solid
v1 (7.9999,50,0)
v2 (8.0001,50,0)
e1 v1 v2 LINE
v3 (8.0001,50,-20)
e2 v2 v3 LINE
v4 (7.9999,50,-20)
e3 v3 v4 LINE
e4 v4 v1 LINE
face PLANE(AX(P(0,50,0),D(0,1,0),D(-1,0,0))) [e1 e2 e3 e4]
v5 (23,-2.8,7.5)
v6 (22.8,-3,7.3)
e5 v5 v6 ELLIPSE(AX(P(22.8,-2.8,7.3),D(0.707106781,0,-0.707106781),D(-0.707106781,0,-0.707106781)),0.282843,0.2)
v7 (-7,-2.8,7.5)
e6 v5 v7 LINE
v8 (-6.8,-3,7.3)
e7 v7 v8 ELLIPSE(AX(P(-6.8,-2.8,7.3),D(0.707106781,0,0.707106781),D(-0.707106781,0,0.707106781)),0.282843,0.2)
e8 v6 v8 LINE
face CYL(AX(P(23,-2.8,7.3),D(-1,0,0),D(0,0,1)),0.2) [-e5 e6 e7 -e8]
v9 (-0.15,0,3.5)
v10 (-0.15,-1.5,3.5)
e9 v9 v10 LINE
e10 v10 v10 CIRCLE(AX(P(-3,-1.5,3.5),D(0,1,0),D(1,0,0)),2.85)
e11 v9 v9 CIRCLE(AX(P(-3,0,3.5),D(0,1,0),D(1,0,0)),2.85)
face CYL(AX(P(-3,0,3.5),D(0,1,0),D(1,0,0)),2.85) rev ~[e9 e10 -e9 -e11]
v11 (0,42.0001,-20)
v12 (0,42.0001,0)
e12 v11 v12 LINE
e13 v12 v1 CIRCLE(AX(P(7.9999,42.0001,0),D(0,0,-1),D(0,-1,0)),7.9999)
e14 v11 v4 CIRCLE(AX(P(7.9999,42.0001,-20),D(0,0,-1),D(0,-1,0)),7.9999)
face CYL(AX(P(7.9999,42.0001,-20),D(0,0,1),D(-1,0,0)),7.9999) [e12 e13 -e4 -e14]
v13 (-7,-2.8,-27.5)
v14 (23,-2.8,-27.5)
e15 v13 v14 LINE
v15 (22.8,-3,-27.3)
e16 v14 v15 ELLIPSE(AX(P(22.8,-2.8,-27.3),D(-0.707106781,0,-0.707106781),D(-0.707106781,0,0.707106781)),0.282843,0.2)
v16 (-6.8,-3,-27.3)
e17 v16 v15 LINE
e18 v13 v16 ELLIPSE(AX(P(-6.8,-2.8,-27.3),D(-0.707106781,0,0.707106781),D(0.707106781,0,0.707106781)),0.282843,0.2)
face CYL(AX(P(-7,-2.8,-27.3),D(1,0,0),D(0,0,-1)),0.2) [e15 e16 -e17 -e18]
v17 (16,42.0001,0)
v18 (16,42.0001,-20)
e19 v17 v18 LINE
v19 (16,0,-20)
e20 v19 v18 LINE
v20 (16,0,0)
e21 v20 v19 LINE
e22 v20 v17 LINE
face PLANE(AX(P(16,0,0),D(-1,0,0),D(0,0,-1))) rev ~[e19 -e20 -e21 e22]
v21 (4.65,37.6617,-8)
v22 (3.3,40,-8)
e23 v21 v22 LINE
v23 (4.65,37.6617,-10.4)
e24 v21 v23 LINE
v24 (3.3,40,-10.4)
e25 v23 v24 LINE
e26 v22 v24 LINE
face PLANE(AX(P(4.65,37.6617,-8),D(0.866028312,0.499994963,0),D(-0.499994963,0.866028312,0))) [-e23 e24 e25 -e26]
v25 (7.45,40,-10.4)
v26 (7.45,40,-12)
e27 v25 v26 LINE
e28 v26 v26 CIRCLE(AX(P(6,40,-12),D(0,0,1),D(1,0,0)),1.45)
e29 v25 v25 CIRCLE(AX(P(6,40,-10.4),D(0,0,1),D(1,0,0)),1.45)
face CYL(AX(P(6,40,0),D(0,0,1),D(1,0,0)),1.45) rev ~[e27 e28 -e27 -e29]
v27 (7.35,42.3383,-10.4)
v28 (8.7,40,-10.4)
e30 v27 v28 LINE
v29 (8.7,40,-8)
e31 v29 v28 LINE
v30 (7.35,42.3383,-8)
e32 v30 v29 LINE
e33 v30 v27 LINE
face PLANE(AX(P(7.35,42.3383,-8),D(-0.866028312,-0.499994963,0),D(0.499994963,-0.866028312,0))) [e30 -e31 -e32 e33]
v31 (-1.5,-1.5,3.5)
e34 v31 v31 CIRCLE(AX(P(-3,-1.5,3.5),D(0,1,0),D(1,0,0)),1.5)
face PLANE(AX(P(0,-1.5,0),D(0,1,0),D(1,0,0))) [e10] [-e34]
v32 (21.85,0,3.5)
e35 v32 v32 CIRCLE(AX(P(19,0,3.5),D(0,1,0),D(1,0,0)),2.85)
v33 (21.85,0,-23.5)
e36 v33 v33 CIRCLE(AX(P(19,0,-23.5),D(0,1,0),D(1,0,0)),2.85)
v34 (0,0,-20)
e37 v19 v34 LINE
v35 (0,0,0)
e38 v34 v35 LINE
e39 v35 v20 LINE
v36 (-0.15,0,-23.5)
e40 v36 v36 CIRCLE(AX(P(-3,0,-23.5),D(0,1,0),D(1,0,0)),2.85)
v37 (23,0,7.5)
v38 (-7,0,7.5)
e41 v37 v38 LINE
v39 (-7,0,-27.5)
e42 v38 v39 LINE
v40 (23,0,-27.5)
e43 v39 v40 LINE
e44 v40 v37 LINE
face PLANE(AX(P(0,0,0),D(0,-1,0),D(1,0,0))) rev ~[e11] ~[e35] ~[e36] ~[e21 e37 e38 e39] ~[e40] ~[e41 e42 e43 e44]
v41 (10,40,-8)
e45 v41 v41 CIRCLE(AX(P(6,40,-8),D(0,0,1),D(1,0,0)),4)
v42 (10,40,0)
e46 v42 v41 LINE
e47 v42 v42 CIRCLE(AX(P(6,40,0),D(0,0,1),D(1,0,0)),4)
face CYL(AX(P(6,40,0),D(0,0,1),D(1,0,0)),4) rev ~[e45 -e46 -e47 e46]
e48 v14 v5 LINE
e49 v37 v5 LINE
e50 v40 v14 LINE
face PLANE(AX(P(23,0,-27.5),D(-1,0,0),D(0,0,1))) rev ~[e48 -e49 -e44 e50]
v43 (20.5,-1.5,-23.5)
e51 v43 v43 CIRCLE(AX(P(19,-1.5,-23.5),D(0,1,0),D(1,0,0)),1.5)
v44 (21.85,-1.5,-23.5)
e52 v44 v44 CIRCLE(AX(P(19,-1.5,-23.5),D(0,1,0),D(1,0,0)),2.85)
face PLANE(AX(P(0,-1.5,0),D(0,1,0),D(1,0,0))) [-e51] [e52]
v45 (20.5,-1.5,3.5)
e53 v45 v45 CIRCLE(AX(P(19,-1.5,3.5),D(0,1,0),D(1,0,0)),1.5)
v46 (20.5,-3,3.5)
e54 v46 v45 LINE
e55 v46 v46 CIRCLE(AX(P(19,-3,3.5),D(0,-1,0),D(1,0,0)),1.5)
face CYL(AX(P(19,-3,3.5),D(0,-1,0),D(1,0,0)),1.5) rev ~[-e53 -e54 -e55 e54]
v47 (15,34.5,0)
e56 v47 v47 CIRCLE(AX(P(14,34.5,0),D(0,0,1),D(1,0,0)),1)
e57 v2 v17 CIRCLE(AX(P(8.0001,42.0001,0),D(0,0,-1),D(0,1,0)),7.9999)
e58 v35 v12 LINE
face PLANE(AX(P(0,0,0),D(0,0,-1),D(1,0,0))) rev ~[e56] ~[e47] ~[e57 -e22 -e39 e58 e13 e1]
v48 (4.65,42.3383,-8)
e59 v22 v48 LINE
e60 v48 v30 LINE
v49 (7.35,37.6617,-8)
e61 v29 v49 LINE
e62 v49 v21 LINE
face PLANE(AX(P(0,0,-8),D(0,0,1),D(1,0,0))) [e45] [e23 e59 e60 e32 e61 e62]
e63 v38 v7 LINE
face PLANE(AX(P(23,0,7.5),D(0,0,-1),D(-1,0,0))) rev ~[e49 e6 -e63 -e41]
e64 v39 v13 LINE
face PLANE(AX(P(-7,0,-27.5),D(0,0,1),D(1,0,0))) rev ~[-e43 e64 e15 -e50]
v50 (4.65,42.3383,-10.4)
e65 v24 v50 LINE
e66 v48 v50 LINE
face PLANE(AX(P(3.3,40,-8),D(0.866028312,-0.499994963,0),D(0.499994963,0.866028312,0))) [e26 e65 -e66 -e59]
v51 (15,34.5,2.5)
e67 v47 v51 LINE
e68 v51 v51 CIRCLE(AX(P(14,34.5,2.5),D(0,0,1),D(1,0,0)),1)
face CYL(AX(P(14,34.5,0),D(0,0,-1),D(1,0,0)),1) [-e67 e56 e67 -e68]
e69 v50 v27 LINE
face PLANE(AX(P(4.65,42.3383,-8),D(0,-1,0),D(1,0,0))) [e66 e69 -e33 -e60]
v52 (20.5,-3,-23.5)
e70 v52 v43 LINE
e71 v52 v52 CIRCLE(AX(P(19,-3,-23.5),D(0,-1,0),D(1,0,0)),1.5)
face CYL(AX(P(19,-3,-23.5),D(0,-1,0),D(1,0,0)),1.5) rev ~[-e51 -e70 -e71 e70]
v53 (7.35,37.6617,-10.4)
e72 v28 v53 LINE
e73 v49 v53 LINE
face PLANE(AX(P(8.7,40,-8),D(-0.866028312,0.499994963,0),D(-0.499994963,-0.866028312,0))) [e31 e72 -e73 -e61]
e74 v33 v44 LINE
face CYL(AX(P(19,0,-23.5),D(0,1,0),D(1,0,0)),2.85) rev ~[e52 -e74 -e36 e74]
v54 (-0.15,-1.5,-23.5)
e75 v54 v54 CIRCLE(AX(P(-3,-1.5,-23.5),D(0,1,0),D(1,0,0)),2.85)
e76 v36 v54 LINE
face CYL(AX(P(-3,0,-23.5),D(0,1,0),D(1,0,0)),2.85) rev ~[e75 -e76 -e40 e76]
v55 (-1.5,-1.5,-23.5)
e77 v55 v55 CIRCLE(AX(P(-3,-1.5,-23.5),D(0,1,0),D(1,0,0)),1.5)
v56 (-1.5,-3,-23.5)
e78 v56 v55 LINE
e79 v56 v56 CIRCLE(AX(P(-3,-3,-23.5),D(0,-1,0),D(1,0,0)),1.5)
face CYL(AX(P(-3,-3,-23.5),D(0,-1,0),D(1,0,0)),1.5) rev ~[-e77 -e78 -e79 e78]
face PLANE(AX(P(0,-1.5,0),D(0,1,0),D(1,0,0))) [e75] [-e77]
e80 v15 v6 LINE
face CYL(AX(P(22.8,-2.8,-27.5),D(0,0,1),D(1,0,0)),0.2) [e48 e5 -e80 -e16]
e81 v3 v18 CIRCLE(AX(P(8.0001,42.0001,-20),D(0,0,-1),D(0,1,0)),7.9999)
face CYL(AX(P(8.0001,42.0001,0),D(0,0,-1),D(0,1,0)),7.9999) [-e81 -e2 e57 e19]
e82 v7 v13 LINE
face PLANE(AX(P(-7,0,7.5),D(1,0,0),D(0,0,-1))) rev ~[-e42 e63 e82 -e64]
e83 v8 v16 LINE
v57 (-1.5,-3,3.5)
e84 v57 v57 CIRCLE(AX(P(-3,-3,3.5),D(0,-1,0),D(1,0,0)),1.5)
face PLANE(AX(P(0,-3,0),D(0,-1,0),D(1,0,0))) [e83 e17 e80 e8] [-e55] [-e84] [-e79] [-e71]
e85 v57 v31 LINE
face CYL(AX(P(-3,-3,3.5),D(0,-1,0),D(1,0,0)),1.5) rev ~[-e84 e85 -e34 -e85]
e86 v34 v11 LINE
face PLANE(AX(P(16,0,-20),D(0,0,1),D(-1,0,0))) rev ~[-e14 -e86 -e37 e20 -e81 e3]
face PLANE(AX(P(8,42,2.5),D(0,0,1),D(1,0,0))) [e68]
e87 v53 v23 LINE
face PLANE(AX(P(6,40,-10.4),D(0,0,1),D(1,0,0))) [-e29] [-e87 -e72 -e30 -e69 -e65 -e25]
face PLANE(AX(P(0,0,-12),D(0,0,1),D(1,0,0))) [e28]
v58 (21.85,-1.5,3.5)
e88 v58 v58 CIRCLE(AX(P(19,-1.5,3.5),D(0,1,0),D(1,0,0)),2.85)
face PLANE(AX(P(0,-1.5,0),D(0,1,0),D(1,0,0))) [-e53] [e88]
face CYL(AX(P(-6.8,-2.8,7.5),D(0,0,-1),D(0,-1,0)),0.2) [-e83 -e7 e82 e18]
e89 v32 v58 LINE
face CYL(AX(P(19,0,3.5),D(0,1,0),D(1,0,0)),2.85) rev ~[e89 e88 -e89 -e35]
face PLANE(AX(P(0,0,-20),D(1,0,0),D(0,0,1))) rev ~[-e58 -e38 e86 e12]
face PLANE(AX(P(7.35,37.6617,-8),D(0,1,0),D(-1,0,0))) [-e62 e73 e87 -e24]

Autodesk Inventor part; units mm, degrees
ref_plane "YZ Plane" through (0, 0, 0) normal (1, 0, 0) x (0, 1, 0)
ref_plane "XZ Plane" through (0, 0, 0) normal (0, 1, 0) x (-1, 0, 0)
ref_plane "XY Plane" through (0, 0, 0) normal (0, 0, 1) x (1, 0, 0)
sketch "底面" plane through (0, 0, 0) normal (0, 1, 0) x (-1, 0, 0)
  line L0 (0, 0) -> (-16, 0)
  line L1 (-16, 0) -> (-16, -20)
  line L2 (-16, -20) -> (0, -20)
  line L3 (0, -20) -> (0, 0)
  dimension "d0" = 16
  dimension "d1" = 20
extrude "本体" add sketch "底面" along normal blind 50
sketch "ねじ穴スケッチ" plane through (0, 0, 0) normal (0, 0, 1) x (1, 0, 0)
  circle A0 centre (6, 40) radius 1.45
  line L0 (0, 50) -> (16, 50) projected
  line L1 (16, 0) -> (16, 50) projected
  point P0 (0, 0)
  dimension "d6" = 10
  dimension "d9" = 2.9
  dimension "d17" = 10
extrude "ねじ穴" cut sketch "ねじ穴スケッチ" against normal blind 12
sketch "接合部スケッチ" plane through (0, 0, 0) normal (0, 0, 1) x (1, 0, 0)
  circle A0 centre (6, 40) radius 1.45 projected
  circle A1 centre (6, 40) radius 4
  point P0 (0, 0)
  dimension "d10" = 8
extrude "接合部" cut sketch "接合部スケッチ" against normal blind 8
sketch "スケッチ4" plane through (6, 40, -8) normal (0, 0, 1) x (1, 0, 0)
  line L0 (2.7, 0) -> (1.35, -2.3383)
  line L1 (1.35, -2.3383) -> (-1.35, -2.3383)
  line L2 (-1.35, -2.3383) -> (-2.7, 0)
  line L3 (-2.7, 0) -> (-1.35, 2.3383)
  line L4 (-1.35, 2.3383) -> (1.35, 2.3383)
  line L5 (1.35, 2.3383) -> (2.7, 0)
  circle A0 centre (0, 0) radius 1.45 projected
  point P0 (-6, -40)
  point P1 (0, 2.3383)
  dimension "d13" = 2.7
  dimension "d14" = 5.4
extrude "ナット穴" cut sketch "スケッチ4" against normal blind 2.4
fillet "フィレット1" radius 8 2 edges at (16, 50, -10) (0, 50, -10)
sketch "スケッチ5" plane through (0, 0, 0) normal (0, -1, 0) x (1, 0, 0)
  line L0 (23, 7.5) -> (-7, 7.5)
  line L1 (-7, 7.5) -> (-7, -27.5)
  line L2 (-7, -27.5) -> (23, -27.5)
  line L3 (23, -27.5) -> (23, 7.5)
  line L4 (0, 0) -> (16, 0) projected
  line L5 (16, 0) -> (16, -20) projected
  line L6 (0, -20) -> (0, 0) projected
  line L7 (16, -20) -> (0, -20) projected
  line L8 (0, 0) -> (16, 0) projected
  line L9 (16, 0) -> (16, -20) projected
  point P0 (8, 7.5)
  point P1 (8, 0)
  point P2 (23, -10)
  point P3 (16, -10)
  dimension "d42" = 30
  dimension "d43" = 35
extrude "足場" add sketch "スケッチ5" along normal blind 3 contours L3 L2 L1 L0 | L4 L5 L7 L6
sketch "スケッチ6" plane through (8, 42, 0) normal (0, 0, 1) x (1, 0, 0)
  circle A0 centre (6, -7.5) radius 1
  line L0 (15, -42) -> (-15, -42) projected
  line L1 (-8, -42) -> (-8, 0) projected
  line L2 (8, -42) -> (8, 0) projected
  dimension "d25" = 2
  dimension "d26" = 34.5
  dimension "d31" = 2
extrude "ストッパー" add sketch "スケッチ6" along normal blind 2.5
sketch "スケッチ7" plane through (0, -3, 0) normal (0, -1, 0) x (1, 0, 0)
  circle A0 centre (-3, 3.5) radius 1.5
  circle A1 centre (19, 3.5) radius 1.5
  circle A2 centre (19, -23.5) radius 1.5
  circle A3 centre (-3, -23.5) radius 1.5
  line L0 (-7, 7.5) -> (-7, -27.5) projected
  line L1 (23, 7.5) -> (-7, 7.5) projected
  line L2 (23, -27.5) -> (23, 7.5) projected
  line L3 (-7, -27.5) -> (23, -27.5) projected
  dimension "d32" = 3
  dimension "d33" = 3
  dimension "d34" = 3
  dimension "d35" = 3
  dimension "d36" = 4
  dimension "d37" = 4
  dimension "d38" = 4
  dimension "d39" = 4
extrude "押し出し7" cut sketch "スケッチ7" against normal through all contours A0 | A1 | A2 | A3
sketch "スケッチ8" plane through (0, 0, 0) normal (0, 1, 0) x (1, 0, 0)
  circle A0 centre (-3, 23.5) radius 1.5 projected
  circle A1 centre (-3, 23.5) radius 2.85
  circle A2 centre (19, 23.5) radius 2.85
  circle A3 centre (-3, -3.5) radius 2.85
  circle A4 centre (19, -3.5) radius 2.85
  circle A5 centre (19, 23.5) radius 1.5 projected
  circle A6 centre (19, -3.5) radius 1.5 projected
  circle A7 centre (-3, -3.5) radius 1.5 projected
  point P0 (0, 0)
  dimension "d44" = 5.7
  dimension "d45" = 5.7
  dimension "d46" = 5.7
  dimension "d47" = 5.7
extrude "ネジ溝" cut sketch "スケッチ8" against normal blind 1.5
fillet "フィレット2" radius 0.2 4 edges at (8, -3, 7.5) (23, -3, -10) (8, -3, -27.5) (-7, -3, -10)
equation "\"d17\" = d6"
equation "\"d37\" = d36"
equation "\"d38\" = d36"
equation "\"d39\" = d36"
equation "\"d45\" = d44"
equation "\"d46\" = d44"
equation "\"d47\" = d44"
properties part number "body-2_3D プリント"
